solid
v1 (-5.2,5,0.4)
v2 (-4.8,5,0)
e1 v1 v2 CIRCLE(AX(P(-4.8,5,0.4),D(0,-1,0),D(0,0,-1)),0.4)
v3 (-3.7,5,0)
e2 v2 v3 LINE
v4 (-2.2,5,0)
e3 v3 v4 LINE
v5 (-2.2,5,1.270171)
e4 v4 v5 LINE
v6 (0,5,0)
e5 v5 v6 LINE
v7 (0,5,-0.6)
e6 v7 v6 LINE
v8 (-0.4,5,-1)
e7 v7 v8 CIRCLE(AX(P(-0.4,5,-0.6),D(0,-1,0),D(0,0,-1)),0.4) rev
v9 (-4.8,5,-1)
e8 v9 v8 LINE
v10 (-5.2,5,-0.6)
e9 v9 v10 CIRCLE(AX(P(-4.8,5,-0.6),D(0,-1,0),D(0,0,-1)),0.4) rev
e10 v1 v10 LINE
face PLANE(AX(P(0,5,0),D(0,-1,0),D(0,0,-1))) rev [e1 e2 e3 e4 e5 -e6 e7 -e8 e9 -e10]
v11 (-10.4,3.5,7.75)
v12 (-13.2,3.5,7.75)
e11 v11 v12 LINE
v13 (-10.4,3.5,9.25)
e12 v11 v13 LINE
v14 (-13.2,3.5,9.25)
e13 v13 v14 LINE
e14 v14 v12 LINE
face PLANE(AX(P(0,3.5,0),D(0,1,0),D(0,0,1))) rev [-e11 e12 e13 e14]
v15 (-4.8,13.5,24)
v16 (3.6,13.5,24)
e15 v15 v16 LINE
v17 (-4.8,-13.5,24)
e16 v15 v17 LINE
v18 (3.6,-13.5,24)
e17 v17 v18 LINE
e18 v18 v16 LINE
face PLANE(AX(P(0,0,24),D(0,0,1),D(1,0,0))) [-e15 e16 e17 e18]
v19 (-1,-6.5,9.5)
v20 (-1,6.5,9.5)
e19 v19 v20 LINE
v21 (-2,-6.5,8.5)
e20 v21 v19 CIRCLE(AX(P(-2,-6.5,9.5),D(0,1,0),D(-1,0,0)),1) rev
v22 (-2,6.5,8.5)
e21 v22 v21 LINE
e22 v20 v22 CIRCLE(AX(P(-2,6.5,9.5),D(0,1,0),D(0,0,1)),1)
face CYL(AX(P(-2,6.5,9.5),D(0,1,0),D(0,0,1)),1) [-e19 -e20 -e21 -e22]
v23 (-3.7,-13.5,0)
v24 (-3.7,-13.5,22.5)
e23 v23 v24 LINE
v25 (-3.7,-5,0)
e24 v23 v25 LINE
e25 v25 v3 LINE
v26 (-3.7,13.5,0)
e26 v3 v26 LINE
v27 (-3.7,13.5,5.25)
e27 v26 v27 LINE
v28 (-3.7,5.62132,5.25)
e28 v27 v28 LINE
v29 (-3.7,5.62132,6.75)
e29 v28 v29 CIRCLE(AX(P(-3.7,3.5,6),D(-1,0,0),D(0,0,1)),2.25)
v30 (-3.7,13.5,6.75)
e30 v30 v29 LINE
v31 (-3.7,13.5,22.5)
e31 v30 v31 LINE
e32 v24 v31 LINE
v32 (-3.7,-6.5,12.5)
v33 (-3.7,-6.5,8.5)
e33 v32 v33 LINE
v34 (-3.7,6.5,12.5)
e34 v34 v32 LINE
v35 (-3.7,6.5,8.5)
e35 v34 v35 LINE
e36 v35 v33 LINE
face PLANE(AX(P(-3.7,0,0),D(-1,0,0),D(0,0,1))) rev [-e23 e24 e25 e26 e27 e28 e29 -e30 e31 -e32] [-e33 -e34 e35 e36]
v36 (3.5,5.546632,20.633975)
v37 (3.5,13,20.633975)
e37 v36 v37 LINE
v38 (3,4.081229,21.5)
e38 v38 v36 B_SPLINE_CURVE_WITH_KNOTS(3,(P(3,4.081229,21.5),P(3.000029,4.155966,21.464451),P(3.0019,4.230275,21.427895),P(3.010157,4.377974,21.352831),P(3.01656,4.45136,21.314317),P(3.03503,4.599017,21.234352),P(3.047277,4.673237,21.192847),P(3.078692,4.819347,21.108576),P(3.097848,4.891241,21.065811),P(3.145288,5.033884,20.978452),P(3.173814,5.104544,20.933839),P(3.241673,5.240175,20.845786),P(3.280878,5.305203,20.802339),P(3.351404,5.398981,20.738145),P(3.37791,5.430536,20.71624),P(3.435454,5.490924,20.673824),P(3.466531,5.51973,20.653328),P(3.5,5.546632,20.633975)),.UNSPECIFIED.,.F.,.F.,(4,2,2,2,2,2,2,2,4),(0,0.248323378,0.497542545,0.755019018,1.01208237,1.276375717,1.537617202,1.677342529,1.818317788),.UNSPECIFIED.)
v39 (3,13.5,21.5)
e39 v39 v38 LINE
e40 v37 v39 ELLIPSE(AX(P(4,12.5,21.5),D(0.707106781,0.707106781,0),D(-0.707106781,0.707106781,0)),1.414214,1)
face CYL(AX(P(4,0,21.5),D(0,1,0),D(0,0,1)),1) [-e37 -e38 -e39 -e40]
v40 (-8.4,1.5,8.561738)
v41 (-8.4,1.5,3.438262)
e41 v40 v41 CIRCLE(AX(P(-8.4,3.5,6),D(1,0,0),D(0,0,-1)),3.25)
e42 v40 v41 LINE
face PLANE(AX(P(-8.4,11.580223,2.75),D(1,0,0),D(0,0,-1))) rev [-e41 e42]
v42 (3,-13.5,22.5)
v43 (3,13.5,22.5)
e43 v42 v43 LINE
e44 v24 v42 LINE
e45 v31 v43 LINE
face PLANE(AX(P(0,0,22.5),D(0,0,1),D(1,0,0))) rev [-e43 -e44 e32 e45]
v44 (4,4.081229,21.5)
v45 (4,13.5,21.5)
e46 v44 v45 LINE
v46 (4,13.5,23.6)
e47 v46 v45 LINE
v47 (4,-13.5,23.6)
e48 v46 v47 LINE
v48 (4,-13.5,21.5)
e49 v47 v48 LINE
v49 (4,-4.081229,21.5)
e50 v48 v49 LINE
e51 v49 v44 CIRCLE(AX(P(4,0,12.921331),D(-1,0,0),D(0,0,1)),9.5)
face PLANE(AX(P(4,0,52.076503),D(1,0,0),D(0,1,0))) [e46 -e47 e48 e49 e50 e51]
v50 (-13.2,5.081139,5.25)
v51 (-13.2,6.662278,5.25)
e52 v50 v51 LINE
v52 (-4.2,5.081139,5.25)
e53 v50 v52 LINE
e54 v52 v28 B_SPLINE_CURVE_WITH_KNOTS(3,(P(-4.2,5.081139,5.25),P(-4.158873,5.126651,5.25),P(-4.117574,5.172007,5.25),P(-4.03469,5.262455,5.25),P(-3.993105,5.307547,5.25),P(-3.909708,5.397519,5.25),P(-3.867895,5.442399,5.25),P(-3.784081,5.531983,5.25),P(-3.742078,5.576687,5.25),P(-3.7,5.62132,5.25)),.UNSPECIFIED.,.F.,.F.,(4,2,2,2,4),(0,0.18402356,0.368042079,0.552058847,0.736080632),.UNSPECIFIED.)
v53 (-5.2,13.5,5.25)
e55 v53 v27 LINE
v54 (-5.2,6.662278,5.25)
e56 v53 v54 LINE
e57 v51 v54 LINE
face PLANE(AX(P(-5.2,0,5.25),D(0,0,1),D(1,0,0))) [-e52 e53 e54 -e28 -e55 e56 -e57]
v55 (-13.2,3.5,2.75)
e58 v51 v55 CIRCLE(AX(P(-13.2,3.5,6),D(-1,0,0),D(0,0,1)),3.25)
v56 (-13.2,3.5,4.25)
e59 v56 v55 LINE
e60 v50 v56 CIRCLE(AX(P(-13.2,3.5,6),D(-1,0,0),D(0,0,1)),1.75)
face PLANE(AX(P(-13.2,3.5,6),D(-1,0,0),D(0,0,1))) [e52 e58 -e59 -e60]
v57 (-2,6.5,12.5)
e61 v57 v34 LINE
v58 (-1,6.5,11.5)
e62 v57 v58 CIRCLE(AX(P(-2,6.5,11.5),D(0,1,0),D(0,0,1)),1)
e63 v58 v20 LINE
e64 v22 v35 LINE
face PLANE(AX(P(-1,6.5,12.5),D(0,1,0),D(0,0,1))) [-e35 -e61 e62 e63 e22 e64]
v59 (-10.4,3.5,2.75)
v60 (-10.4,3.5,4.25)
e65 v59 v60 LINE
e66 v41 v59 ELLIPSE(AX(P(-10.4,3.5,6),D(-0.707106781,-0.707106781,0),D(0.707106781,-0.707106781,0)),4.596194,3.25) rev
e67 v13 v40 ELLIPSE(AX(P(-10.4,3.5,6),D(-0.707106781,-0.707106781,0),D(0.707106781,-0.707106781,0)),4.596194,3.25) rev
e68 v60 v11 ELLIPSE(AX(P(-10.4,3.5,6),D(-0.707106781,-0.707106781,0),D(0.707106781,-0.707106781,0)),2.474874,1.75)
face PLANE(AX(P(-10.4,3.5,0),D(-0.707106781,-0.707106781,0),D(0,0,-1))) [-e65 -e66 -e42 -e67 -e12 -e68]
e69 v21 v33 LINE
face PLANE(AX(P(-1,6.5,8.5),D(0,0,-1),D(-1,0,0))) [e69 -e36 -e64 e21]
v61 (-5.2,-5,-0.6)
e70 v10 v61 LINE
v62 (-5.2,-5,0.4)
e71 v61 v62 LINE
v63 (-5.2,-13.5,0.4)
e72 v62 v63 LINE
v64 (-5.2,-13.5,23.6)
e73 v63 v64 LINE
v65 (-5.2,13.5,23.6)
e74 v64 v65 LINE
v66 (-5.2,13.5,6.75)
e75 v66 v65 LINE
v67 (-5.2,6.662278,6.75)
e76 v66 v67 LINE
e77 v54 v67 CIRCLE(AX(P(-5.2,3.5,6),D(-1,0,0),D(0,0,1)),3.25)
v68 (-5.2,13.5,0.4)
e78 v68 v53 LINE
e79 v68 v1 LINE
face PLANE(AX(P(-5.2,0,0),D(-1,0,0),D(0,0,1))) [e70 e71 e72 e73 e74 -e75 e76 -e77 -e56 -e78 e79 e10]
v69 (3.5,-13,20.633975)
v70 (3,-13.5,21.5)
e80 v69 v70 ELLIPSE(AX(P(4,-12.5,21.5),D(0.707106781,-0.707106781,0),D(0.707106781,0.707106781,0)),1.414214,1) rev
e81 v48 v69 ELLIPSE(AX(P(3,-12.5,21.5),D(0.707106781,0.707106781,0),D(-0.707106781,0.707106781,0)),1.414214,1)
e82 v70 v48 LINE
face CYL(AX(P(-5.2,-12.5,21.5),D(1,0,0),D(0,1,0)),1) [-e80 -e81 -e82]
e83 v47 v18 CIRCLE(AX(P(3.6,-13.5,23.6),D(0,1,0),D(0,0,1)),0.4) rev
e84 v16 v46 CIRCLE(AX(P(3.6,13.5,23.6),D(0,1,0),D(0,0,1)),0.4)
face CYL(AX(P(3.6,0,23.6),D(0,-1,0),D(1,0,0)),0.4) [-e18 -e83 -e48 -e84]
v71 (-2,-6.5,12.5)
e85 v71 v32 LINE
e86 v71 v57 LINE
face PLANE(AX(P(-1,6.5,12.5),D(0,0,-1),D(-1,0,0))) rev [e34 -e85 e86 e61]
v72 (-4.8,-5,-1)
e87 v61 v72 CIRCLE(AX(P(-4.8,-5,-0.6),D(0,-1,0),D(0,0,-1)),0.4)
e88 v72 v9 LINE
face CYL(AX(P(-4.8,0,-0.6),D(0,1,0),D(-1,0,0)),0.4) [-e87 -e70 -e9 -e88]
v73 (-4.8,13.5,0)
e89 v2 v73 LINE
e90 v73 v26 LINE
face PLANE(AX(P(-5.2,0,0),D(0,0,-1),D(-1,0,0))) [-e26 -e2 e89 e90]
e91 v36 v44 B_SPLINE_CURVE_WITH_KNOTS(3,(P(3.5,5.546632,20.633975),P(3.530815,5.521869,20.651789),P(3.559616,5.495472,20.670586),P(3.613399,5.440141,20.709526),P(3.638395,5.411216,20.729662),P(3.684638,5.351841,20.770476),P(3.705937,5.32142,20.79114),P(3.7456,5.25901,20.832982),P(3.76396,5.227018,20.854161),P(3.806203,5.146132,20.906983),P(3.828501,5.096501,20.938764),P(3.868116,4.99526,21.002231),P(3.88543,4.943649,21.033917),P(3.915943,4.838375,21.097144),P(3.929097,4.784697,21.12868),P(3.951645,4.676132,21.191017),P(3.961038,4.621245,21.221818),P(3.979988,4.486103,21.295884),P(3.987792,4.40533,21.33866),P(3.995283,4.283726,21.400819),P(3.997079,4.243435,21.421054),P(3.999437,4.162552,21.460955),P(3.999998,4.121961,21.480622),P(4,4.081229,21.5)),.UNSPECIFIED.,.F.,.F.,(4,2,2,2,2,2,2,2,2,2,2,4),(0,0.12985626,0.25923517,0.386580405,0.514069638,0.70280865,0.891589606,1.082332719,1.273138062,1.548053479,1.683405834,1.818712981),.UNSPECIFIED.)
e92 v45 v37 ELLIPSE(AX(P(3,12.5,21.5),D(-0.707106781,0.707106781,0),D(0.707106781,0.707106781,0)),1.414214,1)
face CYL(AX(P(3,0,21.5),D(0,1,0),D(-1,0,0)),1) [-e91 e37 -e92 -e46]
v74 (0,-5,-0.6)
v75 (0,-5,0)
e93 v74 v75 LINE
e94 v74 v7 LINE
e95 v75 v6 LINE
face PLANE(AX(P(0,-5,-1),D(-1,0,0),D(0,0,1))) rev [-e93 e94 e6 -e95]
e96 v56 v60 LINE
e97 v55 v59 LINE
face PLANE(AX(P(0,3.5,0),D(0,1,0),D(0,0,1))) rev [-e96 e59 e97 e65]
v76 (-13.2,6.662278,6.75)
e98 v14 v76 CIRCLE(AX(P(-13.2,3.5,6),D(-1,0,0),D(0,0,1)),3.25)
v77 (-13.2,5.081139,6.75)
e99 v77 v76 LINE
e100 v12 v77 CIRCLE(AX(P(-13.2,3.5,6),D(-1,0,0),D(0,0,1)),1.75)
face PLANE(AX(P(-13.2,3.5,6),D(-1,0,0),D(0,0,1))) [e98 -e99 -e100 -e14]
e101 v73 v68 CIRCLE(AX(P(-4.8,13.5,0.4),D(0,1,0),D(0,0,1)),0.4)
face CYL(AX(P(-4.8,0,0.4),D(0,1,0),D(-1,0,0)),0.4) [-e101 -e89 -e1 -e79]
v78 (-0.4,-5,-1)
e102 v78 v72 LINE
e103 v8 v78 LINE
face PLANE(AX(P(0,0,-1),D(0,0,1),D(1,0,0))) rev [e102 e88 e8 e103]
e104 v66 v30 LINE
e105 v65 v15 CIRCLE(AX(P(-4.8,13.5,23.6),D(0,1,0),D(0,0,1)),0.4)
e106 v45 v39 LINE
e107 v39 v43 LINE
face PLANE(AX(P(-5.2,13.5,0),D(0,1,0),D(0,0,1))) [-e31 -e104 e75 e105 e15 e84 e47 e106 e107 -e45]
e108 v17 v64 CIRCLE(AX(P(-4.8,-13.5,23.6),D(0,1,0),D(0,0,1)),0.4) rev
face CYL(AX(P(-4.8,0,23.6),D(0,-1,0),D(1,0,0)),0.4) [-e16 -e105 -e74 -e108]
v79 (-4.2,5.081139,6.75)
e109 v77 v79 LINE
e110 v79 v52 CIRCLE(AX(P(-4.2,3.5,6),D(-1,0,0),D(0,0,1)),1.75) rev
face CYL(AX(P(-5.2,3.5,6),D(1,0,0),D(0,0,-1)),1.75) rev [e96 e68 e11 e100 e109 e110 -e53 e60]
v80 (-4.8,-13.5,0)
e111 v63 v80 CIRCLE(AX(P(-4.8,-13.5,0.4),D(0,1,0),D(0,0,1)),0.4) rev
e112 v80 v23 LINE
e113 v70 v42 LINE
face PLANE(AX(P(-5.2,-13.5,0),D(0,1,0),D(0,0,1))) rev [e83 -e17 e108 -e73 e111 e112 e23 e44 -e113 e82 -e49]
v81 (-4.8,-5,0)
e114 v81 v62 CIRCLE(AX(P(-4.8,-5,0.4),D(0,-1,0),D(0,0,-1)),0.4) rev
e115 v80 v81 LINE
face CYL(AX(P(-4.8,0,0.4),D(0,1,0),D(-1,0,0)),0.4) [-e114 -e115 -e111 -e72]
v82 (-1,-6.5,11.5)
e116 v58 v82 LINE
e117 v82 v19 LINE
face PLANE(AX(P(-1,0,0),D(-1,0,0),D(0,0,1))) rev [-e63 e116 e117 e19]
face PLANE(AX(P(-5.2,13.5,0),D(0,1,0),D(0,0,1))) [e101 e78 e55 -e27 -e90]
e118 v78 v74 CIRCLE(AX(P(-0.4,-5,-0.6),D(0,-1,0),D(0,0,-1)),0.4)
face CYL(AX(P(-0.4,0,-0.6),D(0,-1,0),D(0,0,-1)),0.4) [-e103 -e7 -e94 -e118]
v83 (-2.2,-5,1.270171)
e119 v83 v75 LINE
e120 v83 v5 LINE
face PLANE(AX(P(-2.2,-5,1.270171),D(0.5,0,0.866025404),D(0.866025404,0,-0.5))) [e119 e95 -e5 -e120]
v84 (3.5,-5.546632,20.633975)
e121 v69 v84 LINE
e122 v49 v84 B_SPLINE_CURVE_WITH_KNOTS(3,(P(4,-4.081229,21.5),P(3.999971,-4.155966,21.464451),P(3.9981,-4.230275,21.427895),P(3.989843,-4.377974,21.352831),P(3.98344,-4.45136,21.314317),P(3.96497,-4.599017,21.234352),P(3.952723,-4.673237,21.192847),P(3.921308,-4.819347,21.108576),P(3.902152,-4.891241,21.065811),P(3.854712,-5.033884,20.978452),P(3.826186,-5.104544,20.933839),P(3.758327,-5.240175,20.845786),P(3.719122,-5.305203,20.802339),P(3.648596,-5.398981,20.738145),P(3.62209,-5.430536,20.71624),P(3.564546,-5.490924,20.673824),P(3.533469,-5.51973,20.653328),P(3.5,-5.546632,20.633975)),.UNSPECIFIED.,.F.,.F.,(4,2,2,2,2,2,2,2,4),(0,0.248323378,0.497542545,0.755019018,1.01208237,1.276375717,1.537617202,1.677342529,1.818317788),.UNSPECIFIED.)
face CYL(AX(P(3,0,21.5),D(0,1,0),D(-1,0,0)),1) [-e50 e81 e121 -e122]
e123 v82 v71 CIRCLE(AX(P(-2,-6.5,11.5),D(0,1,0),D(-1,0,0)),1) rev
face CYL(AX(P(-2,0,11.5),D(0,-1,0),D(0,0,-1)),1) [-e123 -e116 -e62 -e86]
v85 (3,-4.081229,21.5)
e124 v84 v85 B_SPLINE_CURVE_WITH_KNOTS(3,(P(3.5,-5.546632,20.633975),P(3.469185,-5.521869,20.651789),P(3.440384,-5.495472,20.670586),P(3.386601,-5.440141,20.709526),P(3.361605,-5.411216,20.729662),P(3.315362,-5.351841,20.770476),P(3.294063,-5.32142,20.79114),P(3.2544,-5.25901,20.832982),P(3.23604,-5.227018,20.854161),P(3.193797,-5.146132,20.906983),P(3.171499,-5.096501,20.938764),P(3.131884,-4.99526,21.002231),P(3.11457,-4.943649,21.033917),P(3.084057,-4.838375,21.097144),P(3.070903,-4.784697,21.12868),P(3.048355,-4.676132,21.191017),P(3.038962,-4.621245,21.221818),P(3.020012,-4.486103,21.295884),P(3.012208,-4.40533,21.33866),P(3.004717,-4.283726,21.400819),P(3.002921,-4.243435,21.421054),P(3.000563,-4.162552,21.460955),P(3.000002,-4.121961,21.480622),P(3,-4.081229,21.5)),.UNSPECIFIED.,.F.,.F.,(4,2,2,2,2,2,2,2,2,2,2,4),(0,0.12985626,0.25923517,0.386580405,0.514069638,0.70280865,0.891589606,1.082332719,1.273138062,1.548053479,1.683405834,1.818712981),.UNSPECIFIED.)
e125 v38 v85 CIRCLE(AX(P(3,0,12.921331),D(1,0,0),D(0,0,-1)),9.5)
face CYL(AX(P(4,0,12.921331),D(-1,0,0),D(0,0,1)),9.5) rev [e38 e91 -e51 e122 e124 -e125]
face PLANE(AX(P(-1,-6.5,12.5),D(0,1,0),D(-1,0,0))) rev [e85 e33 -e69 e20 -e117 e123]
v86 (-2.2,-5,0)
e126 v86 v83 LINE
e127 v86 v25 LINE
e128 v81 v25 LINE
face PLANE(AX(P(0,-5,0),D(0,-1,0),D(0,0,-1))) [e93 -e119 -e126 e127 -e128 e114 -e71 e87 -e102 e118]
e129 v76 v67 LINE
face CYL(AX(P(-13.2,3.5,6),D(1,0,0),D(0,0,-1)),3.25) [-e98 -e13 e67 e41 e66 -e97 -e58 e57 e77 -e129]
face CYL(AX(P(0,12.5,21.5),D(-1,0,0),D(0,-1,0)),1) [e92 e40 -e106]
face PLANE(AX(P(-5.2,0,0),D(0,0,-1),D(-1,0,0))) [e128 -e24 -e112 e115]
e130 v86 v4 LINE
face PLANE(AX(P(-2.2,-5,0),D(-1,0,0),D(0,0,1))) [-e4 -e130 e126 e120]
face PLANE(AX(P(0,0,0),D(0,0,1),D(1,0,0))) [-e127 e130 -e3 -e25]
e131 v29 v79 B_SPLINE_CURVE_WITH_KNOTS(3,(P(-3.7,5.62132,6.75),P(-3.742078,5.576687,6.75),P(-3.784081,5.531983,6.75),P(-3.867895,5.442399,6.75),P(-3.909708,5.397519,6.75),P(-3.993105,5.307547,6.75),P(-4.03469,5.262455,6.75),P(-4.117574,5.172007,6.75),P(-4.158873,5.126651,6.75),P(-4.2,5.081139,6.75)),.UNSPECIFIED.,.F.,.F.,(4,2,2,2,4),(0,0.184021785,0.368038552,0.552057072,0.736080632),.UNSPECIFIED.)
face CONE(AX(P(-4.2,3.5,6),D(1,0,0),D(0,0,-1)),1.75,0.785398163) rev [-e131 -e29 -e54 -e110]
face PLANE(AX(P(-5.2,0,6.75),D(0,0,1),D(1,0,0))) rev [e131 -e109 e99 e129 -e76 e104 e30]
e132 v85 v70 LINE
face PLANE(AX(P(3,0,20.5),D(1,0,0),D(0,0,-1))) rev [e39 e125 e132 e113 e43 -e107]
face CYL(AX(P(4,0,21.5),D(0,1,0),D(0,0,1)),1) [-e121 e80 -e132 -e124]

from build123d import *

# Parameters (mm, degrees)
BOSS_EXTRUDE1_DEPTH      = 5
BOSS_EXTRUDE1_DEPTH_BACK = 5
SKETCH2_W                = 3.7
SKETCH2_H                = 10
BOSS_EXTRUDE2_DEPTH      = 1
SKETCH3_W                = 1
SKETCH3_H                = 10
BOSS_EXTRUDE3_DEPTH      = 1.5
SKETCH4_W                = 6.7
SKETCH4_H                = 27
SKETCH4_W_2              = 1.5
BOSS_EXTRUDE4_DEPTH      = 1.5
SKETCH5_W                = 4
SKETCH5_H                = 13
BOSS_EXTRUDE5_DEPTH      = 2.7
CUT_EXTRUDE1_DEPTH       = 29.339724769
BOSS_EXTRUDE6_START      = -1.5
BOSS_EXTRUDE6_DEPTH      = 8
CUT_EXTRUDE2_START       = -3.25
SKETCH8_W                = 4.8
SKETCH8_H                = 6.5
CUT_EXTRUDE2_DEPTH       = 3.25
FILLET4_R                = 1
CHAMFER1_SIZE            = 2
CHAMFER3_SIZE            = 0.5
SKETCH4_3_W              = 1
SKETCH4_3_H              = 27
BOSS_EXTRUDE7_DEPTH      = 2
SKETCH4_4_W              = 1
SKETCH4_4_H              = 27
BOSS_EXTRUDE8_DEPTH      = 1.5
FILLET6_R                = 1
FILLET8_R                = 0.4
SKETCH9_R                = 9.5
CUT_EXTRUDE3_DEPTH       = 32.948239388


with BuildPart() as part:
    # Sketch1 → Boss-Extrude1 (new, two sides: drawn at the far end of the back side and taken through both)
    with BuildSketch(Plane(origin=(0, 0, 0), x_dir=(1, 0, 0), z_dir=(0, 1, 0)).offset(-BOSS_EXTRUDE1_DEPTH_BACK)):
        Polygon((0, 0), (-2.2, 0), (-2.2, -1.270170592), align=None)
    extrude(amount=BOSS_EXTRUDE1_DEPTH + BOSS_EXTRUDE1_DEPTH_BACK)

    # Sketch2 → Boss-Extrude2 (add)
    with BuildSketch(Plane(origin=(0, 0, 0), x_dir=(-1, 0, 0), z_dir=(0, 0, -1))):
        with Locations((1.85, 0)):
            Rectangle(SKETCH2_W, SKETCH2_H)
    extrude(amount=BOSS_EXTRUDE2_DEPTH)

    # Sketch3 → Boss-Extrude3 (add)
    with BuildSketch(Plane.ZY.offset(3.7)):
        Polygon((0, -5), (0, -13.5), (22.5, -13.5), (22.5, 13.5), (0, 13.5), (0, 5), align=None)
        with Locations((-0.5, 0)):
            Rectangle(SKETCH3_W, SKETCH3_H)
    extrude(amount=BOSS_EXTRUDE3_DEPTH)

    # Sketch4 → Boss-Extrude4 (add)
    with BuildSketch(Plane.XY.offset(22.5)):
        with Locations((-0.35, 0)):
            Rectangle(SKETCH4_W, SKETCH4_H)
        with Locations((-4.45, 0)):
            Rectangle(SKETCH4_W_2, SKETCH4_H)
    extrude(amount=BOSS_EXTRUDE4_DEPTH)

    # Sketch5 → Boss-Extrude5 (add)
    with BuildSketch(Plane(origin=(-3.7, 0, 0), x_dir=(0, 0, -1), z_dir=(1, 0, 0))):
        with Locations((-10.5, 0)):
            Rectangle(SKETCH5_W, SKETCH5_H)
    extrude(amount=BOSS_EXTRUDE5_DEPTH)

    # Sketch7 → Cut-Extrude1 (cut, through all)
    with BuildSketch(Plane(origin=(-3.7, 0, 0), x_dir=(0, 0, -1), z_dir=(1, 0, 0))):
        with BuildLine():
            Line((-5.25, 5.08113883), (-5.25, 13.5))
            Line((-5.25, 13.5), (-6.75, 13.5))
            Line((-6.75, 13.5), (-6.75, 5.08113883))
            ThreePointArc((-6.75, 5.08113883), (-6, 1.75), (-5.25, 5.08113883))
        make_face()
    extrude(amount=-CUT_EXTRUDE1_DEPTH, mode=Mode.SUBTRACT)

    # Sketch7<3> → Boss-Extrude6 (add)
    with BuildSketch(Plane(origin=(-3.7, 0, 0), x_dir=(0, 0, -1), z_dir=(1, 0, 0)).offset(BOSS_EXTRUDE6_START)):
        with BuildLine():
            Line((-8.5, 1.423344034), (-8.5, 5.576655966))
            ThreePointArc((-8.5, 5.576655966), (-9.25, 3.5), (-8.5, 1.423344034))
        make_face()
        with BuildLine():
            Line((-6.75, 5.08113883), (-6.75, 6.66227766))
            ThreePointArc((-6.75, 6.66227766), (-7.713262565, 6.261744265), (-8.5, 5.576655966))
            Line((-8.5, 5.576655966), (-8.5, 1.423344034))
            ThreePointArc((-8.5, 1.423344034), (-4.896029892, 0.443245185), (-2.75, 3.5))
            ThreePointArc((-2.75, 3.5), (-3.450490243, 5.515564437), (-5.25, 6.66227766))
            Line((-5.25, 6.66227766), (-5.25, 5.08113883))
            ThreePointArc((-5.25, 5.08113883), (-4.520980054, 4.435414347), (-4.25, 3.5))
            ThreePointArc((-4.25, 3.5), (-6.935414347, 2.020980054), (-6.75, 5.08113883))
        make_face()
    extrude(amount=-BOSS_EXTRUDE6_DEPTH)

    # Sketch8 → Cut-Extrude2 (cut)
    with BuildSketch(Plane(origin=(0, 0.25, 0), x_dir=(-1, 0, 0), z_dir=(0, -1, 0)).offset(CUT_EXTRUDE2_START)):
        with Locations((10.8, -6)):
            Rectangle(SKETCH8_W, SKETCH8_H)
    extrude(amount=CUT_EXTRUDE2_DEPTH, mode=Mode.SUBTRACT)

    # Fillet4
    fillet4_edges = [part.edges().sort_by_distance(p)[0] for p in [
        (-1, 0, 8.5),
        (-1, 0, 12.5),
    ]]
    fillet(fillet4_edges, radius=FILLET4_R)

    # Chamfer1
    # the kernel refuses this chamfer: 2 mm, written as the material it adds along each edge
    with BuildSketch(Plane(origin=(-8.4, 3.5, -2.393365976), x_dir=(0.027495876610586487, -0.9996219169112968, 0), z_dir=(0, 0, 1))) as chamfer1_piece_1_section:
        Polygon((CHAMFER1_SIZE * 0.999621916911, -CHAMFER1_SIZE * 0.0274958766106), (-CHAMFER1_SIZE * 0.0274958766106, -CHAMFER1_SIZE * 0.999621916911), (0, 0), align=None)
    chamfer1_piece_1 = extrude(amount=11.786731952, mode=Mode.PRIVATE)
    chamfer1_piece_1 = chamfer1_piece_1 - Plane(origin=(-8.681951998, 3.5, 6), x_dir=(0, 0.9035079029052511, -0.4285714285714289), z_dir=(1, 0, 0)) * Cylinder(1.75, 32, mode=Mode.PRIVATE)
    chamfer1_piece_1 = chamfer1_piece_1 & Plane(origin=(-8.681951998, 3.5, 6), x_dir=(0, 0.6389710663783268, 0.7692307692307582), z_dir=(1, 0, 0)) * Cylinder(3.25, 32, mode=Mode.PRIVATE)
    add(chamfer1_piece_1)
    with BuildSketch(Plane(origin=(-8.4, 3.5, 2.606634024), x_dir=(-0.9996219169112968, 0.02749587661058627, 0), z_dir=(0, 0, 1))) as chamfer1_piece_2_section:
        Polygon((CHAMFER1_SIZE * 0.999621916911, CHAMFER1_SIZE * 0.0274958766106), (-CHAMFER1_SIZE * 0.0274958766106, CHAMFER1_SIZE * 0.999621916911), (0, 0), align=None)
    chamfer1_piece_2 = extrude(amount=11.786731952, mode=Mode.PRIVATE)
    chamfer1_piece_2 = chamfer1_piece_2 - Plane(origin=(-10.090710098, 3.5, 6), x_dir=(0, 0.9035079029052511, -0.4285714285714289), z_dir=(1, 0, 0)) * Cylinder(1.75, 32, mode=Mode.PRIVATE)
    chamfer1_piece_2 = chamfer1_piece_2 & Plane(origin=(-10.090710098, 3.5, 6), x_dir=(0, 0.6389710663783268, 0.7692307692307582), z_dir=(1, 0, 0)) * Cylinder(3.25, 32, mode=Mode.PRIVATE)
    add(chamfer1_piece_2)

    # Chamfer3
    chamfer3_edges = [part.edges().sort_by_distance(p)[0] for p in [
        (-3.7, 1.75, 6),
    ]]
    chamfer(chamfer3_edges, length=CHAMFER3_SIZE)



with BuildPart() as body_2:
    # Sketch4<3> → Boss-Extrude7 (new body)
    with BuildSketch(Plane.XY.offset(22.5)):
        with Locations((3.5, 0)):
            Rectangle(SKETCH4_3_W, SKETCH4_3_H)
    extrude(amount=-BOSS_EXTRUDE7_DEPTH)


with BuildPart() as part_1:
    add(part.part)

    add(body_2.part)  # Boss-Extrude8 merges body 2
    # Sketch4<4> → Boss-Extrude8 (add)
    with BuildSketch(Plane.XY.offset(22.5)):
        with Locations((3.5, 0)):
            Rectangle(SKETCH4_4_W, SKETCH4_4_H)
        with Locations((3.5, 0)):
            Rectangle(SKETCH4_4_W, SKETCH4_4_H)
        with Locations((3.5, 0)):
            Rectangle(SKETCH4_4_W, SKETCH4_4_H)
    extrude(amount=BOSS_EXTRUDE8_DEPTH)

    # Fillet6
    # the kernel refuses this fillet: 1 mm, written as the material it takes off along each edge
    with BuildSketch(Plane(origin=(6.5, -13.5, 20.5), x_dir=(0, 0, 1), z_dir=(-1, 0, 0))) as fillet6_piece_1:
        with BuildLine():
            CenterArc((FILLET6_R, FILLET6_R), FILLET6_R, 180, 90)
            Line((0, FILLET6_R), (0, 0))
            Line((0, 0), (FILLET6_R, 0))
        make_face()
    extrude(amount=6, mode=Mode.SUBTRACT)
    with BuildSketch(Plane(origin=(4, 16, 20.5), x_dir=(-1, 0, 0), z_dir=(0, -1, 0))) as fillet6_piece_2:
        with BuildLine():
            CenterArc((FILLET6_R, -FILLET6_R), FILLET6_R, 90, 90)
            Line((0, -FILLET6_R), (0, 0))
            Line((0, 0), (FILLET6_R, 0))
        make_face()
    extrude(amount=32, mode=Mode.SUBTRACT)
    with BuildSketch(Plane(origin=(3, -16, 20.5), x_dir=(0, 0, 1), z_dir=(0, 1, 0))) as fillet6_piece_3:
        with BuildLine():
            CenterArc((FILLET6_R, FILLET6_R), FILLET6_R, 180, 90)
            Line((0, FILLET6_R), (0, 0))
            Line((0, 0), (FILLET6_R, 0))
        make_face()
    extrude(amount=32, mode=Mode.SUBTRACT)
    with BuildSketch(Plane(origin=(0.5, 13.5, 20.5), x_dir=(0, -1, 0), z_dir=(1, 0, 0))) as fillet6_piece_4:
        with BuildLine():
            CenterArc((FILLET6_R, -FILLET6_R), FILLET6_R, 90, 90)
            Line((0, -FILLET6_R), (0, 0))
            Line((0, 0), (FILLET6_R, 0))
        make_face()
    extrude(amount=6, mode=Mode.SUBTRACT)

    # Fillet8
    fillet8_edges = [part_1.edges().sort_by_distance(p)[0] for p in [
        (4, 0, 24),
        (0, 0, -1),
        (-5.2, 9.25, 0),
        (-5.2, -9.25, 0),
        (-5.2, 0, -1),
        (-5.2, 0, 24),
    ]]
    fillet(fillet8_edges, radius=FILLET8_R)

    # Sketch9 → Cut-Extrude3 (cut, through all)
    with BuildSketch(Plane.ZY.offset(-3)):
        with Locations((12.921330644, 0)):
            Circle(SKETCH9_R)
    extrude(amount=-CUT_EXTRUDE3_DEPTH, mode=Mode.SUBTRACT)


solid = part_1.part
